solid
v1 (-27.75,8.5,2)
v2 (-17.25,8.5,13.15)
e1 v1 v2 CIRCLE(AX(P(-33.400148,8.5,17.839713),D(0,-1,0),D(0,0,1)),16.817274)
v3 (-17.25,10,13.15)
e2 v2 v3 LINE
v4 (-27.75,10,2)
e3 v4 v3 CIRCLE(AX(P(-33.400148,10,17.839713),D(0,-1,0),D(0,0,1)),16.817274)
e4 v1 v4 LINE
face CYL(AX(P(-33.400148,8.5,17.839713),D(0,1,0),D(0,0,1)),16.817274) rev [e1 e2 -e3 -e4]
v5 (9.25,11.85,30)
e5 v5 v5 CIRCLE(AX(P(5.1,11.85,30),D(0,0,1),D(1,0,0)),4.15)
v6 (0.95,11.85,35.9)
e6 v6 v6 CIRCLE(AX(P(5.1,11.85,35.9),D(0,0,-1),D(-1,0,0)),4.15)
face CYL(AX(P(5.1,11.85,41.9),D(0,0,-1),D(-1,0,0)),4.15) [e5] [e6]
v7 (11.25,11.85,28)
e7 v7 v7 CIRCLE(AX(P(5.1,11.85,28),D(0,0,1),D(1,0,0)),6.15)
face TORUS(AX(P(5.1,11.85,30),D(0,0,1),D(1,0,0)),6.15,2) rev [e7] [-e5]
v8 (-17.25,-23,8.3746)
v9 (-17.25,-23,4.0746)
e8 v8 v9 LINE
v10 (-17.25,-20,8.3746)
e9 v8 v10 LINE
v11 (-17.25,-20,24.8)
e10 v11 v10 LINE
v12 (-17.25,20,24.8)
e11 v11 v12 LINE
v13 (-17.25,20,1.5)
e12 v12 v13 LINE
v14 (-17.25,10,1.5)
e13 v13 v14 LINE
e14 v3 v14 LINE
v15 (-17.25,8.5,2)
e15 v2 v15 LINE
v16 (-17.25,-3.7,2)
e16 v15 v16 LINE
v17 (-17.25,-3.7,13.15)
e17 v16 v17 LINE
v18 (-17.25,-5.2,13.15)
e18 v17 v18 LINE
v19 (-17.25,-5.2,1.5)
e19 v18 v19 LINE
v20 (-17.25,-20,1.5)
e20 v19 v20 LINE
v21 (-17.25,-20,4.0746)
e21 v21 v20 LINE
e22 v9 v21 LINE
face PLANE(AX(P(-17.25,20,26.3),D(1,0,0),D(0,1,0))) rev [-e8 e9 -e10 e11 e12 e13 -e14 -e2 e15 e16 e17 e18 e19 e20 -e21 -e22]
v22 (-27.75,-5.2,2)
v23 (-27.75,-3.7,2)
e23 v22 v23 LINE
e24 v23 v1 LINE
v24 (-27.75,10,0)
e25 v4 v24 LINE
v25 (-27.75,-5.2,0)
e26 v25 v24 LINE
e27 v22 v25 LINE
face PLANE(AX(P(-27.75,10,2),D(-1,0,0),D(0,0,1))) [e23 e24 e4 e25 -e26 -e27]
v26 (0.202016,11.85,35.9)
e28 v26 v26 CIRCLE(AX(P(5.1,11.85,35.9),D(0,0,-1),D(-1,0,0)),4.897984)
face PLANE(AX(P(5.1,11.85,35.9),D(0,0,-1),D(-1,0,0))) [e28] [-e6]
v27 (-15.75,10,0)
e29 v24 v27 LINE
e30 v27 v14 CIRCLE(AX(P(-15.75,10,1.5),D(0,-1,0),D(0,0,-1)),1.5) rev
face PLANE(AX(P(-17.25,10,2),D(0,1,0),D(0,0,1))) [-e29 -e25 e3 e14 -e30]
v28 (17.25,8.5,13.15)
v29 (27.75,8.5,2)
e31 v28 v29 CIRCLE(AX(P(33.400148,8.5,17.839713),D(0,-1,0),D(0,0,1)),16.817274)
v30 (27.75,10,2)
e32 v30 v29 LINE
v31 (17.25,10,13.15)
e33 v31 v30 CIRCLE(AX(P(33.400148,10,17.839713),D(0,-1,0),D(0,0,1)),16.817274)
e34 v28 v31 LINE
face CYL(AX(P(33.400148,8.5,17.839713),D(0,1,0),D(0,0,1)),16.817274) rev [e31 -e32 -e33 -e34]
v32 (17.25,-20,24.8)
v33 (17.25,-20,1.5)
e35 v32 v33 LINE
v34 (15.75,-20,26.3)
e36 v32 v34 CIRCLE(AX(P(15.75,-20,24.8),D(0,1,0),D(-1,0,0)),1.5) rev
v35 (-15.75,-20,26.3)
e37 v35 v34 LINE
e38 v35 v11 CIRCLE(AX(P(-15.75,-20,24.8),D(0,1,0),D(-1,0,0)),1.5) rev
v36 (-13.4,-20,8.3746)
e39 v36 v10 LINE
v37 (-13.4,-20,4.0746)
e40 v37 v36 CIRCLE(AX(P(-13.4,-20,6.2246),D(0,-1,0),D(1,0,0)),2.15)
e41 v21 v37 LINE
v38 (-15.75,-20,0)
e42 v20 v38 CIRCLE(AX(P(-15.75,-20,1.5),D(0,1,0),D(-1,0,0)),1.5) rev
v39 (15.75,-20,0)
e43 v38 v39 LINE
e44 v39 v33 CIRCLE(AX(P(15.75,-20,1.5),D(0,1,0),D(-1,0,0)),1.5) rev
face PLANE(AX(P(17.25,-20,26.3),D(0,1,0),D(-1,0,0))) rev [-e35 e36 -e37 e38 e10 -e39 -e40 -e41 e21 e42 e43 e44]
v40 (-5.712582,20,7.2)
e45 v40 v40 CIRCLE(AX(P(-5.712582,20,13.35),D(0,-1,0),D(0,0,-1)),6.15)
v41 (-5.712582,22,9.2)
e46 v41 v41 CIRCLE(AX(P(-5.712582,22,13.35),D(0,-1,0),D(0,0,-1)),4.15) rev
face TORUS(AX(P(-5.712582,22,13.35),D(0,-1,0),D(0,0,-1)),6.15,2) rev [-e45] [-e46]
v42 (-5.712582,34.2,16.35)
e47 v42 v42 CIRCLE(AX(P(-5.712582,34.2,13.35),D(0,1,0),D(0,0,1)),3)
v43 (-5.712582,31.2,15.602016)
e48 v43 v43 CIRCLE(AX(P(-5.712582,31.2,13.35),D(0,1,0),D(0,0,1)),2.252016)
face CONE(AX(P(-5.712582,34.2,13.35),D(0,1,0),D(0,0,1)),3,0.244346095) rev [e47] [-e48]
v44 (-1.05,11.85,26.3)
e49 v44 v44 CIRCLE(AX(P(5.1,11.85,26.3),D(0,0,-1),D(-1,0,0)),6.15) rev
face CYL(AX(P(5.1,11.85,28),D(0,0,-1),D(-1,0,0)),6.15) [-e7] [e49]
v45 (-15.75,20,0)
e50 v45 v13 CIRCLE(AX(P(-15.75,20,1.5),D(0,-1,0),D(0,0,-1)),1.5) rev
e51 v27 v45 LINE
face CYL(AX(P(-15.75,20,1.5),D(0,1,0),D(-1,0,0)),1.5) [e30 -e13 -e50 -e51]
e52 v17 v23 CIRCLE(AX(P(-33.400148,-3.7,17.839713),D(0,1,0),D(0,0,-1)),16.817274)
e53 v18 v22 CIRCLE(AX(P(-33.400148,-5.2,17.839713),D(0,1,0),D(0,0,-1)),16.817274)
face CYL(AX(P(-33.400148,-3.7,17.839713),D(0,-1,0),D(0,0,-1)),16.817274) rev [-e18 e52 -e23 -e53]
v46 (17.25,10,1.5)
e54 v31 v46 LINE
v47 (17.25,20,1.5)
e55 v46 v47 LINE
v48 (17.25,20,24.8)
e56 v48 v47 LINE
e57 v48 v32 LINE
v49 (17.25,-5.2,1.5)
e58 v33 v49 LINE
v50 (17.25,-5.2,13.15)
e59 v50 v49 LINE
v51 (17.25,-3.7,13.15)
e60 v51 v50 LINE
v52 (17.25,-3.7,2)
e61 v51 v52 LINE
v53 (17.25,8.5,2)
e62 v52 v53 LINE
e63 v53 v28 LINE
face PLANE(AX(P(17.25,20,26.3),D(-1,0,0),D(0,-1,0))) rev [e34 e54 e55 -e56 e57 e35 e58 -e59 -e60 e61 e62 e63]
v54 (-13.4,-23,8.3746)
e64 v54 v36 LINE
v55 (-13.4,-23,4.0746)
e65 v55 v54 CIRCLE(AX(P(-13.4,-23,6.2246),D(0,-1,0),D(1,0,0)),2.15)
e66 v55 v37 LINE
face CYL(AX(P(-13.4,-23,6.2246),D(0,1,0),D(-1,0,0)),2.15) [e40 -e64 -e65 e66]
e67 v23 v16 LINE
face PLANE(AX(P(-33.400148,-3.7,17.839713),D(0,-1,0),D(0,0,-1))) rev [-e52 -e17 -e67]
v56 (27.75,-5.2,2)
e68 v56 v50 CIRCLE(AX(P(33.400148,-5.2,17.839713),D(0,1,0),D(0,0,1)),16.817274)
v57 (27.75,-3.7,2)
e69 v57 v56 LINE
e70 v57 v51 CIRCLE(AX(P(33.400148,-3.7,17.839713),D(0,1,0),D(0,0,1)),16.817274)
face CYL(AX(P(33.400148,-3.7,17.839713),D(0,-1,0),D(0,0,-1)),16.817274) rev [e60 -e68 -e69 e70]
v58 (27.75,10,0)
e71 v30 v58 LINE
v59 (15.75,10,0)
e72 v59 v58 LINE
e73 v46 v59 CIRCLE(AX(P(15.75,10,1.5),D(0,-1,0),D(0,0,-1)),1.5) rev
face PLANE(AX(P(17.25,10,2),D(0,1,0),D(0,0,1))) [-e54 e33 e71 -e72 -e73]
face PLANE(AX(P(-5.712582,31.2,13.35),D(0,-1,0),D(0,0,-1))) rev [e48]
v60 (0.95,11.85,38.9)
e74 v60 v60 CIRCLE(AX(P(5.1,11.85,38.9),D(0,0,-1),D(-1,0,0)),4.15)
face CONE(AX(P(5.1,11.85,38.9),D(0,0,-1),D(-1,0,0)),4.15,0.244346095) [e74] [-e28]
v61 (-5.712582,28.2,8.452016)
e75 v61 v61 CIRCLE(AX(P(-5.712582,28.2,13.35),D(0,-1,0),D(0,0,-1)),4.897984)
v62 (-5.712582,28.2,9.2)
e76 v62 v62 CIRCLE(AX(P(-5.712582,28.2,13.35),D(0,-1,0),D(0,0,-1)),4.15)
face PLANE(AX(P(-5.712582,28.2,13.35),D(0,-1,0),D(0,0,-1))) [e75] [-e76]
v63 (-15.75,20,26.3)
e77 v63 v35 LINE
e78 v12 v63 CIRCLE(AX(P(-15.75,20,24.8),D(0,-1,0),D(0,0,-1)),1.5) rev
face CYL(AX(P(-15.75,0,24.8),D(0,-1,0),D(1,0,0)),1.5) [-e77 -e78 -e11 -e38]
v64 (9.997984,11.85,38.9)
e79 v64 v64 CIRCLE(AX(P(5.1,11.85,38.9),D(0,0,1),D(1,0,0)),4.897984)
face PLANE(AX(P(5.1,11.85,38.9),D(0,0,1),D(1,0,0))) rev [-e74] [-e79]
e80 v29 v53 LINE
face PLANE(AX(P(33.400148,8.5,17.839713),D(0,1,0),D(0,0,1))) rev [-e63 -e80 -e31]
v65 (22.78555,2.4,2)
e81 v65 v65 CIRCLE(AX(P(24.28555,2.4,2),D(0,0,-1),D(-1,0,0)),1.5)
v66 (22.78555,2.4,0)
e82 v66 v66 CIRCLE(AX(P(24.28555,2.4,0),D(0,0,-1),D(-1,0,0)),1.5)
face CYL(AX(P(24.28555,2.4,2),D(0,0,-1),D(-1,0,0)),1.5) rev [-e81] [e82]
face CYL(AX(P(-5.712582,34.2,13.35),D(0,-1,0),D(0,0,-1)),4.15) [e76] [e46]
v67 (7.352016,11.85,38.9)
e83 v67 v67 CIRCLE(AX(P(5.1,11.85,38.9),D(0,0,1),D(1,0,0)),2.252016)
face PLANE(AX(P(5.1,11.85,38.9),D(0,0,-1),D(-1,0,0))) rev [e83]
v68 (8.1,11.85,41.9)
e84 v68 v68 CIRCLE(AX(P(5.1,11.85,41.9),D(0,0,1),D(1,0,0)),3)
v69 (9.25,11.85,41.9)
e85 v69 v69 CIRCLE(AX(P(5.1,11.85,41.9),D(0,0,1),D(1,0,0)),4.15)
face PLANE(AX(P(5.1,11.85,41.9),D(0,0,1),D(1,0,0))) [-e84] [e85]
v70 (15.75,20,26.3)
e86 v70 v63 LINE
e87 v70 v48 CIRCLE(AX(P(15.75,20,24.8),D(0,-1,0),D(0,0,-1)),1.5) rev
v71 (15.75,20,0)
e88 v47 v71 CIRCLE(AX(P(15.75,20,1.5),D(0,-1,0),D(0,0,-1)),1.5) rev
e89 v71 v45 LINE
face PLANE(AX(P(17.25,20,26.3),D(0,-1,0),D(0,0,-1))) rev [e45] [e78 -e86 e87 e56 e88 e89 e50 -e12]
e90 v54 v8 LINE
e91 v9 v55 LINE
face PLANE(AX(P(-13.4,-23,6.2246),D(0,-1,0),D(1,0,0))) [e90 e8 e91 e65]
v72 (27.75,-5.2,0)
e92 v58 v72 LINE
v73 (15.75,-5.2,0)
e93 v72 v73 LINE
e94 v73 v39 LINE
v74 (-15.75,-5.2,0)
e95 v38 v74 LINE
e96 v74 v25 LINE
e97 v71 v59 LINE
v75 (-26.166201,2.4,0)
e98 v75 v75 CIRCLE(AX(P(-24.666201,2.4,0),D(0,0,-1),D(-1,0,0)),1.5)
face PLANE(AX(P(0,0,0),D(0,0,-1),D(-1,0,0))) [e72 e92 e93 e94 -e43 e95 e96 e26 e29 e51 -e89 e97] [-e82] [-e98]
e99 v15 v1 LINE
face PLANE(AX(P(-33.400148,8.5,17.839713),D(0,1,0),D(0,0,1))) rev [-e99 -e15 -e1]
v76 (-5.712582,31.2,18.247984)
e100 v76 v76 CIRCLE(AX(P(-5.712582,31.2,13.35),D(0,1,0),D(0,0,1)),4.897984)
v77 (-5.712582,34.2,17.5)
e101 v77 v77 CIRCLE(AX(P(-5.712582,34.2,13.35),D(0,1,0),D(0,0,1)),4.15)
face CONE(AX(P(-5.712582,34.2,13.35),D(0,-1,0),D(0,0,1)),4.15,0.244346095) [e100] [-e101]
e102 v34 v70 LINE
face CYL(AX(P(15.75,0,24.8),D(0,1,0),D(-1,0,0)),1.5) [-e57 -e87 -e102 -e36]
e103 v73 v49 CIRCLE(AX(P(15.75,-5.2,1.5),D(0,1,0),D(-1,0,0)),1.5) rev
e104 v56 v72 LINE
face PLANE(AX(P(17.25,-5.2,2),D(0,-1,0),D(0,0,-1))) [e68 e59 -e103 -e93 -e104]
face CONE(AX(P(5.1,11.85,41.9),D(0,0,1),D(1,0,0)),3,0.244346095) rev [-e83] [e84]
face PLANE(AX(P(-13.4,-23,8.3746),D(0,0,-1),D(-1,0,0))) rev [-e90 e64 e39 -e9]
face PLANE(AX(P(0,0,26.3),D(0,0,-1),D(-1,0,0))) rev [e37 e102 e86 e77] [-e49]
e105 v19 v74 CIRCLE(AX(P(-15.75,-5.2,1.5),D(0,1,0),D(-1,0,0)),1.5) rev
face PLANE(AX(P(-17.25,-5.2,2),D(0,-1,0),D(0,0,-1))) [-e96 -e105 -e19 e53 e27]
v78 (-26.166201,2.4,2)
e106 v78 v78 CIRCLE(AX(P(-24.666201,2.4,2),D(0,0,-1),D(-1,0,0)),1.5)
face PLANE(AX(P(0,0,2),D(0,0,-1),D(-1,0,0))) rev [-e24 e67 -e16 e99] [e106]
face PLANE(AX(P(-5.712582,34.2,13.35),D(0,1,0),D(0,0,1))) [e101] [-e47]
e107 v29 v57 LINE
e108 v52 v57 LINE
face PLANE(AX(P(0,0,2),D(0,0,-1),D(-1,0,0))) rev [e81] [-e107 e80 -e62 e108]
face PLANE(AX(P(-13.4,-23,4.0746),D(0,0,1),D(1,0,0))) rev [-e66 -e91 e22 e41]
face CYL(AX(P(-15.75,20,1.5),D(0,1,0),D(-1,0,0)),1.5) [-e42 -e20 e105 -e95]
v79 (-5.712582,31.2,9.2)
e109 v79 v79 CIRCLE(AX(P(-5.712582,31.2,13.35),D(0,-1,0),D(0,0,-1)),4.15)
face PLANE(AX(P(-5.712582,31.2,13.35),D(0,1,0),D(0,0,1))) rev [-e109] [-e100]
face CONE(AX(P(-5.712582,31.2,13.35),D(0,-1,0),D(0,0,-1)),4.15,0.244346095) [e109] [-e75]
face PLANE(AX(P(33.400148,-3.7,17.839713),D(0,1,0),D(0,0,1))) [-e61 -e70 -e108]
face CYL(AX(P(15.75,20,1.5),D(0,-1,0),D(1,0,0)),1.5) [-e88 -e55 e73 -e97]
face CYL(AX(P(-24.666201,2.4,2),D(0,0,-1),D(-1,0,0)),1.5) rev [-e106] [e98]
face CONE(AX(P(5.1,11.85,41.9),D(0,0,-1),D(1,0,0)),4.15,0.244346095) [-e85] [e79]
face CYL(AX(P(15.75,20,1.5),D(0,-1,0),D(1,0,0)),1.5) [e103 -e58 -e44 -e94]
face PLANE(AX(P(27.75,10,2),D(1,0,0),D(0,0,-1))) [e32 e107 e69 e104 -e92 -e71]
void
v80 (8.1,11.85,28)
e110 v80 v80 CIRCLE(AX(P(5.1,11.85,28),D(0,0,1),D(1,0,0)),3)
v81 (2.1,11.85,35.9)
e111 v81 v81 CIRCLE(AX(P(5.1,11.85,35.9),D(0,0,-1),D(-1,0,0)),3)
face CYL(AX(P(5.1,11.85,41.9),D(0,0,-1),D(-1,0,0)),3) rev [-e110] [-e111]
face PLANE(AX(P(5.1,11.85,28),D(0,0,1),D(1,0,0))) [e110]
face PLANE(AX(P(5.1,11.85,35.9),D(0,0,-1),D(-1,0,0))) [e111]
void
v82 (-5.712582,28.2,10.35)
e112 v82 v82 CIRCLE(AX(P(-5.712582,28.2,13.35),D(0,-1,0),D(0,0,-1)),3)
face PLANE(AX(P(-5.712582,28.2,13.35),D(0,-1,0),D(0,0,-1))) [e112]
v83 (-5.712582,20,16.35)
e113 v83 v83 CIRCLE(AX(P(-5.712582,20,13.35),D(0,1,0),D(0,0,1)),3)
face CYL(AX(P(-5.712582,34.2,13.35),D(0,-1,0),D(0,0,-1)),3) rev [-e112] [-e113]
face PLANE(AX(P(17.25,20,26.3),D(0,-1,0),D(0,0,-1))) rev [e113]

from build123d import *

# Parameters (mm, degrees)
SKETCH1_W            = 34.5
SKETCH1_H            = 40
BOSS_EXTRUDE1_DEPTH  = 26.3
FILLET1_R            = 1.5
SKETCH2_R            = 4.15
SKETCH2_R_2          = 3
BOSS_EXTRUDE2_DEPTH  = 14.2
SKETCH3_R            = 4.15
SKETCH3_R_2          = 3
BOSS_EXTRUDE3_DEPTH  = 3
BOSS_EXTRUDE3_DRAFT  = 14
SKETCH4_R            = 4.15
BOSS_EXTRUDE4_DEPTH  = 3
BOSS_EXTRUDE4_DRAFT  = -14
SKETCH5_R            = 4.15
SKETCH5_R_2          = 3
BOSS_EXTRUDE5_DEPTH  = 15.6
SKETCH6_R            = 6.15
BOSS_EXTRUDE6_DEPTH  = 1.7
FILLET2_R            = 2
SKETCH7_R            = 4.15
SKETCH7_R_2          = 3
BOSS_EXTRUDE7_DEPTH  = 3
BOSS_EXTRUDE7_DRAFT  = 14
SKETCH8_R            = 4.15
BOSS_EXTRUDE8_DEPTH  = 3
BOSS_EXTRUDE8_DRAFT  = -14
BOSS_EXTRUDE9_DEPTH  = 3
SKETCH10_W           = 10.5
SKETCH10_H           = 15.2
SKETCH10_R           = 1.5
BOSS_EXTRUDE10_DEPTH = 2
SKETCH11_W           = 1.5
SKETCH11_H           = 15.2
BOSS_EXTRUDE11_DEPTH = 36
BOSS_EXTRUDE12_DEPTH = 1.5
BOSS_EXTRUDE14_START = -1.5
BOSS_EXTRUDE14_DEPTH = 1.5


with BuildPart() as part:
    # Sketch1 → Boss-Extrude1 (new body)
    with BuildSketch(Plane.XY):
        Rectangle(SKETCH1_W, SKETCH1_H)
    extrude(amount=BOSS_EXTRUDE1_DEPTH)

    # Fillet1
    fillet1_edges = [part.edges().sort_by_distance(p)[0] for p in [
        (17.25, 0, 26.3),
        (-17.25, 0, 26.3),
        (17.25, 0, 0),
        (-17.25, 0, 0),
    ]]
    fillet(fillet1_edges, radius=FILLET1_R)

    # Sketch2 → Boss-Extrude2 (add)
    with BuildSketch(Plane(origin=(0, 20, 0), x_dir=(1, 0, 0), z_dir=(0, 1, 0))):
        with Locations(Location((-5.712581949, -13.35, 0), (0, 0, 270))):
            Circle(SKETCH2_R)
        with Locations(Location((-5.712581949, -13.35, 0), (0, 0, 270))):
            Circle(SKETCH2_R_2, mode=Mode.SUBTRACT)
    extrude(amount=BOSS_EXTRUDE2_DEPTH)


with BuildPart() as boss_extrude3_tool:
    # Sketch3 → Boss-Extrude3 (with draft: the straight prism first)
    with BuildSketch(Plane(origin=(0, 34.2, 0), x_dir=(1, 0, 0), z_dir=(0, 1, 0))):
        with Locations(Location((-5.712581949, -13.35, 0), (0, 0, 270))):
            Circle(SKETCH3_R)
        with Locations(Location((-5.712581949, -13.35, 0), (0, 0, 270))):
            Circle(SKETCH3_R_2, mode=Mode.SUBTRACT)
    extrude(amount=-BOSS_EXTRUDE3_DEPTH)
    # Boss-Extrude3: the draft: its side faces are tilted about the plane it starts from
    boss_extrude3_sides = [boss_extrude3_tool.faces().sort_by_distance(p)[0] for p in [
        (-5.712581949, 32.7, 9.2),
        (-5.712581949, 32.7, 10.35),
    ]]
    draft(boss_extrude3_sides, Plane(origin=(0, 34.2, 0), x_dir=(1, 0, 0), z_dir=(0, 1, 0)), BOSS_EXTRUDE3_DRAFT)


with BuildPart() as part_1:
    add(part.part)

    # Boss-Extrude3: add boss_extrude3_tool
    add(boss_extrude3_tool.part)


with BuildPart() as boss_extrude4_tool:
    # Sketch4 → Boss-Extrude4 (with draft: the straight prism first)
    with BuildSketch(Plane.XZ.offset(-31.2)):
        with Locations(Location((-5.712581949, 13.35, 0), (0, 0, 270))):
            Circle(SKETCH4_R)
    extrude(amount=BOSS_EXTRUDE4_DEPTH)
    # Boss-Extrude4: the draft: its side faces are tilted about the plane it starts from
    boss_extrude4_sides = [boss_extrude4_tool.faces().sort_by_distance(p)[0] for p in [
        (-5.712581949, 29.7, 17.5),
    ]]
    draft(boss_extrude4_sides, Plane.XZ.offset(-31.2), BOSS_EXTRUDE4_DRAFT)


with BuildPart() as part_2:
    add(part_1.part)

    # Boss-Extrude4: add boss_extrude4_tool
    add(boss_extrude4_tool.part)

    # Sketch5 → Boss-Extrude5 (add)
    with BuildSketch(Plane.XY.offset(26.3)):
        with Locations(Location((5.1, 11.85, 0), (0, 0, 180))):
            Circle(SKETCH5_R)
        with Locations((5.1, 11.85)):
            Circle(SKETCH5_R_2, mode=Mode.SUBTRACT)
    extrude(amount=BOSS_EXTRUDE5_DEPTH)

    # Sketch6 → Boss-Extrude6 (add)
    with BuildSketch(Plane.XY.offset(26.3)):
        with Locations(Location((5.1, 11.85, 0), (0, 0, 180))):
            Circle(SKETCH6_R)
    extrude(amount=BOSS_EXTRUDE6_DEPTH)

    # Fillet2
    fillet2_edges = [part_2.edges().sort_by_distance(p)[0] for p in [
        (-5.712581949, 20, 9.2),
        (9.25, 11.85, 28),
    ]]
    fillet(fillet2_edges, radius=FILLET2_R - 0.0001)  # a hair under: the kernel refuses the full size


with BuildPart() as boss_extrude7_tool:
    # Sketch7 → Boss-Extrude7 (with draft: the straight prism first)
    with BuildSketch(Plane.XY.offset(41.9)):
        with Locations((5.1, 11.85)):
            Circle(SKETCH7_R)
        with Locations((5.1, 11.85)):
            Circle(SKETCH7_R_2, mode=Mode.SUBTRACT)
    extrude(amount=-BOSS_EXTRUDE7_DEPTH)
    # Boss-Extrude7: the draft: its side faces are tilted about the plane it starts from
    boss_extrude7_sides = [boss_extrude7_tool.faces().sort_by_distance(p)[0] for p in [
        (0.95, 11.85, 40.4),
        (2.1, 11.85, 40.4),
    ]]
    draft(boss_extrude7_sides, Plane.XY.offset(41.9), BOSS_EXTRUDE7_DRAFT)


with BuildPart() as part_3:
    add(part_2.part)

    # Boss-Extrude7: add boss_extrude7_tool
    add(boss_extrude7_tool.part)


with BuildPart() as boss_extrude8_tool:
    # Sketch8 → Boss-Extrude8 (with draft: the straight prism first)
    with BuildSketch(Plane(origin=(0, 0, 38.9), x_dir=(-1, 0, 0), z_dir=(0, 0, -1))):
        with Locations((-5.1, 11.85)):
            Circle(SKETCH8_R)
    extrude(amount=BOSS_EXTRUDE8_DEPTH)
    # Boss-Extrude8: the draft: its side faces are tilted about the plane it starts from
    boss_extrude8_sides = [boss_extrude8_tool.faces().sort_by_distance(p)[0] for p in [
        (9.25, 11.85, 37.4),
    ]]
    draft(boss_extrude8_sides, Plane(origin=(0, 0, 38.9), x_dir=(-1, 0, 0), z_dir=(0, 0, -1)), BOSS_EXTRUDE8_DRAFT)


with BuildPart() as part_4:
    add(part_3.part)

    # Boss-Extrude8: add boss_extrude8_tool
    add(boss_extrude8_tool.part)

    # Sketch9 → Boss-Extrude9 (add)
    with BuildSketch(Plane.XZ.offset(20)):
        with BuildLine():
            Line((-13.4, 4.074600211), (-17.25, 4.074600211))
            Line((-17.25, 4.074600211), (-17.25, 8.374600211))
            Line((-17.25, 8.374600211), (-13.4, 8.374600211))
            ThreePointArc((-13.4, 8.374600211), (-11.25, 6.224600211), (-13.4, 4.074600211))
        make_face()
    extrude(amount=BOSS_EXTRUDE9_DEPTH)

    # Sketch10 → Boss-Extrude10 (add)
    # profile 1 of 2: a face of its own
    with BuildSketch(Plane(origin=(0, 0, 0), x_dir=(-1, 0, 0), z_dir=(0, 0, -1))):
        with Locations((22.5, 2.4)):
            Rectangle(SKETCH10_W, SKETCH10_H)
        with Locations((24.666201251, 2.4)):
            Circle(SKETCH10_R, mode=Mode.SUBTRACT)
    # profile 2 of 2: a face of its own
    with BuildSketch(Plane(origin=(0, 0, 0), x_dir=(-1, 0, 0), z_dir=(0, 0, -1))):
        with Locations((-22.5, 2.4)):
            Rectangle(SKETCH10_W, SKETCH10_H)
        with Locations((-24.285549997, 2.4)):
            Circle(SKETCH10_R, mode=Mode.SUBTRACT)
    extrude(amount=-BOSS_EXTRUDE10_DEPTH)

    # Sketch11 → Boss-Extrude11 (add)
    with BuildSketch(Plane(origin=(-17.25, 0, 0), x_dir=(0, 0, -1), z_dir=(1, 0, 0))):
        with Locations((-0.75, 2.4)):
            Rectangle(SKETCH11_W, SKETCH11_H)
    extrude(amount=BOSS_EXTRUDE11_DEPTH)

    # Sketch12 → Boss-Extrude12 (add)
    with BuildSketch(Plane.XZ.offset(5.2)):
        with BuildLine():
            Line((-17.25, 13.15), (-17.25, 2))
            Line((-17.25, 2), (-27.75, 2))
            ThreePointArc((-27.75, 2), (-21.157033541, 6.310323065), (-17.25, 13.15))
        make_face()
        with BuildLine():
            Line((17.25, 2), (27.75, 2))
            ThreePointArc((27.75, 2), (21.157033541, 6.310323065), (17.25, 13.15))
            Line((17.25, 13.15), (17.25, 2))
        make_face()
    extrude(amount=-BOSS_EXTRUDE12_DEPTH)

    # Sketch13 → Boss-Extrude14 (add)
    with BuildSketch(Plane(origin=(0, 10, 0), x_dir=(1, 0, 0), z_dir=(0, 1, 0)).offset(BOSS_EXTRUDE14_START)):
        with BuildLine():
            Line((-17.25, -13.15), (-17.25, -2))
            Line((-17.25, -2), (-27.75, -2))
            ThreePointArc((-27.75, -2), (-21.157033541, -6.310323065), (-17.25, -13.15))
        make_face()
        with BuildLine():
            Line((27.75, -2), (17.25, -2))
            Line((17.25, -2), (17.25, -13.15))
            ThreePointArc((17.25, -13.15), (21.157033541, -6.310323065), (27.75, -2))
        make_face()
    extrude(amount=BOSS_EXTRUDE14_DEPTH)


solid = part_4.part
